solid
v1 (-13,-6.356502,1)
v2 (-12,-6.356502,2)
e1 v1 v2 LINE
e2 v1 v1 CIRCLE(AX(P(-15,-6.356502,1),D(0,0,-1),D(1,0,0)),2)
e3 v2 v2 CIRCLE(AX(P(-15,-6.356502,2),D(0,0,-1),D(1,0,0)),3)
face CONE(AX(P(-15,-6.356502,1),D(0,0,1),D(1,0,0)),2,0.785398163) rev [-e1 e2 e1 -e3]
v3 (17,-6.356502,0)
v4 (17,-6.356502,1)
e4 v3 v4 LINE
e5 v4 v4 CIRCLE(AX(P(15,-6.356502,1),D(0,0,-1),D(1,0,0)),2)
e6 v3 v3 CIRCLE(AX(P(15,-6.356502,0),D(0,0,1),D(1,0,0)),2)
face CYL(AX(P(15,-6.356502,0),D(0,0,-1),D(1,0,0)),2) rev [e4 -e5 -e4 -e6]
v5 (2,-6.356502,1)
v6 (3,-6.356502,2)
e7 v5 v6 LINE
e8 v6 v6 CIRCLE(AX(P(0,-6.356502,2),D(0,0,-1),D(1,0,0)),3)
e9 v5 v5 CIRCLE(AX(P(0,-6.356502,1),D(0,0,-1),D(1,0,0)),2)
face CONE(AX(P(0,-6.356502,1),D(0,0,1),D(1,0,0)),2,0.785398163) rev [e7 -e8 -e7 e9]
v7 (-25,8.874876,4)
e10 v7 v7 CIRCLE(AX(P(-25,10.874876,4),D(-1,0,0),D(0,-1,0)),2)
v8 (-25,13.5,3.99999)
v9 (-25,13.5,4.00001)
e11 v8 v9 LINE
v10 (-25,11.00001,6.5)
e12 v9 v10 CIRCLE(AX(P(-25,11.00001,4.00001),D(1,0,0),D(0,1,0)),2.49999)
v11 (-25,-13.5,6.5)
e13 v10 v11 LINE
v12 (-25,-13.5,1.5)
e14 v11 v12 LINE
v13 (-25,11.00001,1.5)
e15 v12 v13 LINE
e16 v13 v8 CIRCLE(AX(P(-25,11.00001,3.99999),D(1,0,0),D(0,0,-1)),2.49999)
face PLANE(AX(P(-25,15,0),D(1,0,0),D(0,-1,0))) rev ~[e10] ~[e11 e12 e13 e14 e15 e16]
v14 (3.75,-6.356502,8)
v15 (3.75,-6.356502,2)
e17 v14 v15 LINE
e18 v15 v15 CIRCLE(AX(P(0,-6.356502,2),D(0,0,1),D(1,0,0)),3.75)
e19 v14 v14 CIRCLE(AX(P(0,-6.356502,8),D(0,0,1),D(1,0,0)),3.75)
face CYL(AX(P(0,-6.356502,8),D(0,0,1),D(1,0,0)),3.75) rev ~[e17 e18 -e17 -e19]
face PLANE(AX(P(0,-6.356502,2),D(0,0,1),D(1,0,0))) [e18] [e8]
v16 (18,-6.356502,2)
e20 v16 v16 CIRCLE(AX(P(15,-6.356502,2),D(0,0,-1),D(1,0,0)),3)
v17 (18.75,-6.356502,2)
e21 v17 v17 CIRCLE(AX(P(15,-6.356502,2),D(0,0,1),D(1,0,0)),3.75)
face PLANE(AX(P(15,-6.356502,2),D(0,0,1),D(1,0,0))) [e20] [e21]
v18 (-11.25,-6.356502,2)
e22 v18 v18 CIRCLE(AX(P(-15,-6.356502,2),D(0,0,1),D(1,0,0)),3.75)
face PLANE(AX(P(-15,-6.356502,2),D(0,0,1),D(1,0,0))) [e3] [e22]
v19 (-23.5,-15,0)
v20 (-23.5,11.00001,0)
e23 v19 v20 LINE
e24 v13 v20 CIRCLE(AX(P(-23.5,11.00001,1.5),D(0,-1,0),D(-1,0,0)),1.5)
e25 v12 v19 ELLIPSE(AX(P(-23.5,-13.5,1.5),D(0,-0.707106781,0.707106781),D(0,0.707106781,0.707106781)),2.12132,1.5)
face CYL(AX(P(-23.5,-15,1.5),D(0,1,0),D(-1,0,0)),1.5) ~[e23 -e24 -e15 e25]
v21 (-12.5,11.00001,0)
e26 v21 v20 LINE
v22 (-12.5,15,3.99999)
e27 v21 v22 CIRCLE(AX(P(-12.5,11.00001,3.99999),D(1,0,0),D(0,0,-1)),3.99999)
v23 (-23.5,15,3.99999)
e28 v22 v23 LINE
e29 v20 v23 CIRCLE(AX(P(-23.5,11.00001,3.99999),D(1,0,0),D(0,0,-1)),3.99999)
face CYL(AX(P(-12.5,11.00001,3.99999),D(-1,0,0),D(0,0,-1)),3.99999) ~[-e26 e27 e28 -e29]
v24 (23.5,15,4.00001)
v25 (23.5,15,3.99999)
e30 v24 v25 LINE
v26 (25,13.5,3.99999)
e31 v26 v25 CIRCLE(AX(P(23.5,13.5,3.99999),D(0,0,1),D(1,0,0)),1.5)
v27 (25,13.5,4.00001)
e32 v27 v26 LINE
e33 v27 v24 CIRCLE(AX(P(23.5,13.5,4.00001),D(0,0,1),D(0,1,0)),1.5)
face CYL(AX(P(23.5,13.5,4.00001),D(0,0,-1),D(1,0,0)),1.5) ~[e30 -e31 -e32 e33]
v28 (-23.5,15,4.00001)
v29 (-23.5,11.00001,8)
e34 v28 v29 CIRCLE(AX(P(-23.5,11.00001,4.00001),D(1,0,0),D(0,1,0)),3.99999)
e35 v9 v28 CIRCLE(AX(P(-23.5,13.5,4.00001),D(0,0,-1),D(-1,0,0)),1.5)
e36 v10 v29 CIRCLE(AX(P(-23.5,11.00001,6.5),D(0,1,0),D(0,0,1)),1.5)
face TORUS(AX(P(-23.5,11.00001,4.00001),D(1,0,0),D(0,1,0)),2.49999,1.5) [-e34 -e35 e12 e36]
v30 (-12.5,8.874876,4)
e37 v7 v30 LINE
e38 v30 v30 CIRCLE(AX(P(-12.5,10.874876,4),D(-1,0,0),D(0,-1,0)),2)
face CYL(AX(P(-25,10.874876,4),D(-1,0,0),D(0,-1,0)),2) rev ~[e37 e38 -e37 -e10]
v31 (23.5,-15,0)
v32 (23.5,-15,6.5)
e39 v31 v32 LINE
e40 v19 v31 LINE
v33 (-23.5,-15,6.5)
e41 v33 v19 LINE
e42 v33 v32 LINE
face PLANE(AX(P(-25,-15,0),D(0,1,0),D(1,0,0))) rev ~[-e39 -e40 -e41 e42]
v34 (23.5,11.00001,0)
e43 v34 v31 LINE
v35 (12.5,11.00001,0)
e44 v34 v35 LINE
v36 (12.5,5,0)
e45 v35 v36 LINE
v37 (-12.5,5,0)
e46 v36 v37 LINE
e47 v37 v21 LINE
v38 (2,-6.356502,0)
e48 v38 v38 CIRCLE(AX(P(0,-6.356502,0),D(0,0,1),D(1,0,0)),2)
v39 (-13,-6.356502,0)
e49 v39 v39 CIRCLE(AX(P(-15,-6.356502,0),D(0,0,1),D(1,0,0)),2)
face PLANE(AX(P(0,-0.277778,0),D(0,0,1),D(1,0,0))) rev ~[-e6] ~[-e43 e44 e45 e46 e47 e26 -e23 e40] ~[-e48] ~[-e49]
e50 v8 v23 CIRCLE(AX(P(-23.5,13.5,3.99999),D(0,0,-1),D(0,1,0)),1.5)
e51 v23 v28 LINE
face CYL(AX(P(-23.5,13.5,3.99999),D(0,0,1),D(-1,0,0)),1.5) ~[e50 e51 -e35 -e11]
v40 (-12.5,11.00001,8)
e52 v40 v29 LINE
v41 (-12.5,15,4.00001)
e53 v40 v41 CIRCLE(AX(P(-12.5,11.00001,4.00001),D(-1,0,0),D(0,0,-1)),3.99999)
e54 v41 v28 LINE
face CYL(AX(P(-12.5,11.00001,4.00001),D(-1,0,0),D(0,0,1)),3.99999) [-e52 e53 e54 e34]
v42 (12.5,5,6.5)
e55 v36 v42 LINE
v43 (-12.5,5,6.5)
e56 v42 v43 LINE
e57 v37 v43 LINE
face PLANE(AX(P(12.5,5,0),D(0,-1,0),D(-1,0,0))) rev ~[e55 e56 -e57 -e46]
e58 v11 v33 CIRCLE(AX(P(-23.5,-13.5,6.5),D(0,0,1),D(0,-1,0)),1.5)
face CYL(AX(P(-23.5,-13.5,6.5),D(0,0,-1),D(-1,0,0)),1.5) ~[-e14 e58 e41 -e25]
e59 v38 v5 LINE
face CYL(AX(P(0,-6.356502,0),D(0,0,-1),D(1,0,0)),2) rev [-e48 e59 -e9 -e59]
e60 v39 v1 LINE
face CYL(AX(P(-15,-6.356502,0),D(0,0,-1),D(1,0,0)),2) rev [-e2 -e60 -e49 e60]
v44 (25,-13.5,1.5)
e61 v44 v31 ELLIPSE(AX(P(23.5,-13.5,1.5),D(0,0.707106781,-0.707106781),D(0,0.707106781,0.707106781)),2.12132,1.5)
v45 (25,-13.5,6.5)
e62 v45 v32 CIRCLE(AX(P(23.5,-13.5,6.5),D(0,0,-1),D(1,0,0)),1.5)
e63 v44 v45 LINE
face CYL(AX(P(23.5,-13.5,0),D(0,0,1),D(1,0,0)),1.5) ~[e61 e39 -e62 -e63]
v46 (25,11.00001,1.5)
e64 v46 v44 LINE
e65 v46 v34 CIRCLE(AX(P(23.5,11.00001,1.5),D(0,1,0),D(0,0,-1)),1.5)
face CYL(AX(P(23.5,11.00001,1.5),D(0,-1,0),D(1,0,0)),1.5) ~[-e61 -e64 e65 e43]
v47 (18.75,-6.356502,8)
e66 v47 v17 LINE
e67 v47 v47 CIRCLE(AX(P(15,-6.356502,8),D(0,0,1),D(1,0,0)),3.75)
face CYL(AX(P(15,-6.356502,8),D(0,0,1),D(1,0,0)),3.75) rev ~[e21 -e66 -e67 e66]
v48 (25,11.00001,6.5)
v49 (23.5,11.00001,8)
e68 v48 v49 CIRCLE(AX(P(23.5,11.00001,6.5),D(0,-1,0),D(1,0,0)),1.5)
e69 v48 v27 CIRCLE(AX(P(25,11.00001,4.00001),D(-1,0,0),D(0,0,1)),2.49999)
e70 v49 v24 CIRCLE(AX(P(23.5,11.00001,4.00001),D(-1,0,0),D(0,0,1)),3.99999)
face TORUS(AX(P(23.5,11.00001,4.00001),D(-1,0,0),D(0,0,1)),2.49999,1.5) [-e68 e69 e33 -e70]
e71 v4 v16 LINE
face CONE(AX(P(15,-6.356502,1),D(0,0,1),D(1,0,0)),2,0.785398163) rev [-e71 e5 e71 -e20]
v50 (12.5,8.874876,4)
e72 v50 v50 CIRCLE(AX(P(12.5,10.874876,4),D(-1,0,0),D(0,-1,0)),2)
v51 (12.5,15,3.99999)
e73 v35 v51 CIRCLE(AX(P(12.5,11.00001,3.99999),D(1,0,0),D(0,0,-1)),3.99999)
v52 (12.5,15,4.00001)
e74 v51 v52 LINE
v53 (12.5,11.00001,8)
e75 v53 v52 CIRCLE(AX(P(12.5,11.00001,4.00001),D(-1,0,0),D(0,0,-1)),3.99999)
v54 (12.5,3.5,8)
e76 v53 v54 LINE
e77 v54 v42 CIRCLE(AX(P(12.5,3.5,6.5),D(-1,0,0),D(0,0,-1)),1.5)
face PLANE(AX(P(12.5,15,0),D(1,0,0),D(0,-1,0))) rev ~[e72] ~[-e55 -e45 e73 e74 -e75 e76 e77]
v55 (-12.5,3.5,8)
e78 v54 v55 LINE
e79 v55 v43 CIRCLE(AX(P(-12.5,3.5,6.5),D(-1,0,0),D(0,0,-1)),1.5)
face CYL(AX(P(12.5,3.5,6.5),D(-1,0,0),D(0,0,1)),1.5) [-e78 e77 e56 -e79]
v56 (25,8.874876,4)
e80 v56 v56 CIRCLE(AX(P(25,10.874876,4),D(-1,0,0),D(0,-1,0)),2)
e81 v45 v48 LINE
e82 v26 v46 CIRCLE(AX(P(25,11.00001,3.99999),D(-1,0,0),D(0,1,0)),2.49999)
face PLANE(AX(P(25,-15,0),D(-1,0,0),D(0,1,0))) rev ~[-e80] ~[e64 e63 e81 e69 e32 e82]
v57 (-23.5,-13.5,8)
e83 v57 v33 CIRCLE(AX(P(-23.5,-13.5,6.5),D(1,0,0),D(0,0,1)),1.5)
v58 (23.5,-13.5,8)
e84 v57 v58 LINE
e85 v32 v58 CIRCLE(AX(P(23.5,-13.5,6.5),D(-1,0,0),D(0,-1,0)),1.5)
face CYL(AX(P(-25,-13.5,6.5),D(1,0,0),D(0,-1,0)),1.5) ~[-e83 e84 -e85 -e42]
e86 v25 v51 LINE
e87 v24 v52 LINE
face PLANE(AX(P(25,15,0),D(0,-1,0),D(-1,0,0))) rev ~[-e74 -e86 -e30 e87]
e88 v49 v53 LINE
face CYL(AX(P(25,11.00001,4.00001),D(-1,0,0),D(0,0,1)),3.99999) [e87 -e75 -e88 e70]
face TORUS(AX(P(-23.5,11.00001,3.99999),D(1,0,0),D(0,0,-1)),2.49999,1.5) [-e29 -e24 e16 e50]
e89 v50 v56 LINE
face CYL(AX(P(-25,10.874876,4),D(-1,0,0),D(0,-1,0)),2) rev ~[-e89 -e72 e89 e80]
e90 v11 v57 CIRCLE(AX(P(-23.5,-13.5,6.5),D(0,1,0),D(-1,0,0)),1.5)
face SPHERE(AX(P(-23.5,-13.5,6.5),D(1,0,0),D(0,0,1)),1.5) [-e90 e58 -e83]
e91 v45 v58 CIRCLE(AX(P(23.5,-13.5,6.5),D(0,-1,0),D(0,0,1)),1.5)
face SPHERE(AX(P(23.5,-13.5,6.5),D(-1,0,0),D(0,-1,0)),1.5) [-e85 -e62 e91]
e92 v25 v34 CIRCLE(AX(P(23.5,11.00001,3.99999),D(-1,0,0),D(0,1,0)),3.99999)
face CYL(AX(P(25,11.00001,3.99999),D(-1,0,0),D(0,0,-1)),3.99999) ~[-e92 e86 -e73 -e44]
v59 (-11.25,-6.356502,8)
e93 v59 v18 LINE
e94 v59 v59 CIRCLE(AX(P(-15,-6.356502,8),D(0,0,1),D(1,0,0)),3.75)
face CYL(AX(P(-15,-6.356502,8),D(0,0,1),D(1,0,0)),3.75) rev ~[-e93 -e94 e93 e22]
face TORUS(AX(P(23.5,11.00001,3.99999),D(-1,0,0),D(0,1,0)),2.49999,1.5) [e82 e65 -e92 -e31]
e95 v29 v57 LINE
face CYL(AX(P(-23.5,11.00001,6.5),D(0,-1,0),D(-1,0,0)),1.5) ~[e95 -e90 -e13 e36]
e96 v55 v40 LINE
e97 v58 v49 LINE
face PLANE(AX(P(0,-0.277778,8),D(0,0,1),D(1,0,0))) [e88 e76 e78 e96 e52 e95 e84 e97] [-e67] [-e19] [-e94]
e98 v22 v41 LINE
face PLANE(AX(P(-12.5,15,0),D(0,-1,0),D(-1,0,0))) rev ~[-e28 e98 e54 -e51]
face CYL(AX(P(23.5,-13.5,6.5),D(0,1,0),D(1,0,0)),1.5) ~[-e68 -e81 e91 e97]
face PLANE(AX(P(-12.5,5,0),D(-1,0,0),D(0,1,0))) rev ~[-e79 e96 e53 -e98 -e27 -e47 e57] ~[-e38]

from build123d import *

# Parameters (mm, degrees)
F0_R     = 2
F1_DEPTH = 8
F2_R     = 2
F3_DEPTH = 60
F4_R     = 3.99999
F5_R     = 1.5
F6_R     = 3.75
F7_DEPTH = 6
F8_SIZE  = 1
F9_R     = 1.5


# Not quite as in the source:
# - a fillet or chamfer is up to 0.001 mm smaller than in the source, because OpenCascade refuses the exact size


with BuildPart() as f1:
    # F0 (on Top) → F1 (new body)
    with BuildSketch(Plane.XY):
        Polygon((25, -15), (25, 15), (12.5, 15), (12.5, 5), (-12.5, 5), (-12.5, 15), (-25, 15), (-25, -15), align=None)
        with Locations((-15, -6.3565024175)):
            Circle(F0_R, mode=Mode.SUBTRACT)
        with Locations((0, -6.3565024175)):
            Circle(F0_R, mode=Mode.SUBTRACT)
        with Locations((15, -6.3565024175)):
            Circle(F0_R, mode=Mode.SUBTRACT)
    extrude(amount=F1_DEPTH)

    # F2 (on face) → F3 (cut)
    with BuildSketch(Plane(origin=(-25, 0, 0), x_dir=(0, -1, 0), z_dir=(-1, 0, 0))):
        with Locations((-10.8748758212, 4)):
            Circle(F2_R)
    extrude(amount=-F3_DEPTH, mode=Mode.SUBTRACT)

    # F4 (radius 4 in the source; OpenCascade refuses exactly that, so slightly less here)
    f4_edges = [f1.edges().sort_by_distance(p)[0] for p in [
        (-18.75, 15, 8),
        (18.75, 15, 8),
        (-18.75, 15, 0),
        (18.75, 15, 0),
    ]]
    fillet(f4_edges, radius=F4_R)

    # F5
    f5_edges = [f1.edges().sort_by_distance(p)[0] for p in [
        (0, 5, 8),
        (0, -15, 8),
    ]]
    fillet(f5_edges, radius=F5_R)

    # F6 (on face) → F7 (cut)
    with BuildSketch(Plane.XY.offset(8)):
        with Locations((-15, -6.3565024175)):
            Circle(F6_R)
        with Locations((0, -6.3565024175)):
            Circle(F6_R)
        with Locations((15, -6.3565024175)):
            Circle(F6_R)
    extrude(amount=-F7_DEPTH, mode=Mode.SUBTRACT)

    # F8
    f8_edges = [f1.edges().sort_by_distance(p)[0] for p in [
        (-17, -6.356502, 2),
        (-2, -6.356502, 2),
        (13, -6.356502, 2),
    ]]
    chamfer(f8_edges, length=F8_SIZE)

    # F9
    f9_edges = [f1.edges().sort_by_distance(p)[0] for p in [
        (25, -1.249995, 8),
        (-25, -1.249995, 8),
    ]]
    fillet(f9_edges, radius=F9_R)


solid = f1.part
